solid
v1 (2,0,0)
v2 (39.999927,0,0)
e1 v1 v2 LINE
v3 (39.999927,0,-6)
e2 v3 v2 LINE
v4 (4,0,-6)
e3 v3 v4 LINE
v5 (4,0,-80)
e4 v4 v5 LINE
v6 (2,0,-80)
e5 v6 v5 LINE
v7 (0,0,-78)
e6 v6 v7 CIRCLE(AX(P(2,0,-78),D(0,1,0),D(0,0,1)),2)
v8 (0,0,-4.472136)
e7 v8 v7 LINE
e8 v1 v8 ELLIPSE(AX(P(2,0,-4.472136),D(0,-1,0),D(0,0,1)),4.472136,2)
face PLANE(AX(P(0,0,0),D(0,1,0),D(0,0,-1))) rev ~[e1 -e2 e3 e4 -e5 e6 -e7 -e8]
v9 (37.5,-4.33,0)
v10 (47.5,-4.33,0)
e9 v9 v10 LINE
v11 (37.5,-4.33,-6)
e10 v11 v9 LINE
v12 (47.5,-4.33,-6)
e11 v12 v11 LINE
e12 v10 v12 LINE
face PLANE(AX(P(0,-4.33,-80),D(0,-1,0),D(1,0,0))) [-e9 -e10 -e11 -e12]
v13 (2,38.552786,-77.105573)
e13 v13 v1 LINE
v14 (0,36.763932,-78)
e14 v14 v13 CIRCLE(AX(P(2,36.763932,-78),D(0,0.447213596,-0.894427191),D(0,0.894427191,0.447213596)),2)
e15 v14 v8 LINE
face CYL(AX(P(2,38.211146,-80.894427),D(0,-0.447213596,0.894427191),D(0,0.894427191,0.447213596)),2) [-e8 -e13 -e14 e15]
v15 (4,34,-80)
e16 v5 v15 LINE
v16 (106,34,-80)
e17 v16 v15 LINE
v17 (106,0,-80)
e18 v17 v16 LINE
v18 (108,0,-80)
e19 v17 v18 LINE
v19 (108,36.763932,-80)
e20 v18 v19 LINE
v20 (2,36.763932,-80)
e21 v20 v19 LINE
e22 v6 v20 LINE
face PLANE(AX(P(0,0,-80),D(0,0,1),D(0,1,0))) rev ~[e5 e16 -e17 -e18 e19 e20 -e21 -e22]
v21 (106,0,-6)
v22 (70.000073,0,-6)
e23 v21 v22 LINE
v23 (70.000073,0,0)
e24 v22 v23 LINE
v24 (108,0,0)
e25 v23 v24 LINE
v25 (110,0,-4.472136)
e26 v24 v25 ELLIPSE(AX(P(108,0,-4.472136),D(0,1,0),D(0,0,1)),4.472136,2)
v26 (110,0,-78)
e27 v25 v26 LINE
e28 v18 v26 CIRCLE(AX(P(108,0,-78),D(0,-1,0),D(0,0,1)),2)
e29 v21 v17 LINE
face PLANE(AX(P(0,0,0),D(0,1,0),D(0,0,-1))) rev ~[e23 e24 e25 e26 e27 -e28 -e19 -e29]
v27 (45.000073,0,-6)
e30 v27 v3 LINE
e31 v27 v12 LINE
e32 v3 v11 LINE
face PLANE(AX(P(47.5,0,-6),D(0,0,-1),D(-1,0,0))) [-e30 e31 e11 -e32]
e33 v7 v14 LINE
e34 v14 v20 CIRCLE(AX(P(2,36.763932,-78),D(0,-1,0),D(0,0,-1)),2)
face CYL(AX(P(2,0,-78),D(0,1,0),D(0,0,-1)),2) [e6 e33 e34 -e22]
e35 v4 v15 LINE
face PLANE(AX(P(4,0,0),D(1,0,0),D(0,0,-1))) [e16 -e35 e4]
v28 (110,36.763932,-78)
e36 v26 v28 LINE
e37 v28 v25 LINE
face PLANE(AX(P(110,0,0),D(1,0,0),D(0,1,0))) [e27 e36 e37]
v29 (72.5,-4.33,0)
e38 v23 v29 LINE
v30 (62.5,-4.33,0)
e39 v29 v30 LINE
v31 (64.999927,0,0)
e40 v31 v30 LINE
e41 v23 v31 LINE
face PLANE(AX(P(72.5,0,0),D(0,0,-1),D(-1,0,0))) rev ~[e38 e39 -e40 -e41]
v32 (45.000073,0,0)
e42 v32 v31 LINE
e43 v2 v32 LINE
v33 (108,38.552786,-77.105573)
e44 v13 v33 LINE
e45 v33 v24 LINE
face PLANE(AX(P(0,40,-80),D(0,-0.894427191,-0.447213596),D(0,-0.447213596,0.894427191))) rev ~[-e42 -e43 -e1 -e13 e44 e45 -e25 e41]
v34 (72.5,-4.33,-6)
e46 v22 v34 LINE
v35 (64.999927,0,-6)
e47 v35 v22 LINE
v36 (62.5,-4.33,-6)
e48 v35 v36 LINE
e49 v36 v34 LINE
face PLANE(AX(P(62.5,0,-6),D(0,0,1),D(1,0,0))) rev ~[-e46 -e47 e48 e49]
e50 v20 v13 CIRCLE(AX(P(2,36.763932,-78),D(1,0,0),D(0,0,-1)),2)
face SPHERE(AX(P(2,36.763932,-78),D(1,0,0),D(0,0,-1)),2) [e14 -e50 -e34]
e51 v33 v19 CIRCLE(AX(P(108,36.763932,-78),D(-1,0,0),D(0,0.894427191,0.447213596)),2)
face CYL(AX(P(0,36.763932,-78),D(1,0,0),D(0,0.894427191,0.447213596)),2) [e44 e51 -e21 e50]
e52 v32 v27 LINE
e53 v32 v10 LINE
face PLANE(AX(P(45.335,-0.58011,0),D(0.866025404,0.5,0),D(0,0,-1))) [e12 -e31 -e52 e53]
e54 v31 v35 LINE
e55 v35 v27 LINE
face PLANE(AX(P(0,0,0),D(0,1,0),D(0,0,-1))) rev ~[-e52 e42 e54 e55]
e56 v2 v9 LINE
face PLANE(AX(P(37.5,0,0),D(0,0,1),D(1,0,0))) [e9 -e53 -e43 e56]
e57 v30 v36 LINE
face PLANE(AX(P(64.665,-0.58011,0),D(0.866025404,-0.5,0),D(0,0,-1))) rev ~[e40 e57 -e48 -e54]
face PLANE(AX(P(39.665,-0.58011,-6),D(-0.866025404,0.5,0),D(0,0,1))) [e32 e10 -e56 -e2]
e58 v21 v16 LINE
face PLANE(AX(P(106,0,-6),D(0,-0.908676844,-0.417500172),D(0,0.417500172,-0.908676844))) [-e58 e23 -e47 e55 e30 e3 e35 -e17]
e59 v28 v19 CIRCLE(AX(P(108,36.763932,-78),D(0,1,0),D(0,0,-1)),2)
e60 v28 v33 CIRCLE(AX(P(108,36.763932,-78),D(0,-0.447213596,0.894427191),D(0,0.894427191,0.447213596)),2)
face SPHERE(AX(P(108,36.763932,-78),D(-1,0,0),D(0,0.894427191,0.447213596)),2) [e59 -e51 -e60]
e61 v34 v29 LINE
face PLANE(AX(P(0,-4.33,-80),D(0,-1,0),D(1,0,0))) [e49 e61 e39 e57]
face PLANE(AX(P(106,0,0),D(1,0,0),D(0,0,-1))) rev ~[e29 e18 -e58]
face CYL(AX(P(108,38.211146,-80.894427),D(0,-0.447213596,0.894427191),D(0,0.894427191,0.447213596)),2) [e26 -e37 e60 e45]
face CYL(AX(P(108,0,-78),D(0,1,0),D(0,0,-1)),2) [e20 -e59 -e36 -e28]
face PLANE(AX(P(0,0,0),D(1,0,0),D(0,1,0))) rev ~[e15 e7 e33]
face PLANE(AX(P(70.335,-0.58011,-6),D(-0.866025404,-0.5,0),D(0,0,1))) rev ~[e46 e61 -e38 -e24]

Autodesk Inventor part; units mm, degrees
ref_plane "YZ Plane" through (0, 0, 0) normal (1, 0, 0) x (0, 1, 0)
ref_plane "XY Plane" through (0, 0, 0) normal (0, 0, 1) x (1, 0, 0)
sketch "Sketch1" plane through (0, 0, 0) normal (1, 0, 0) x (0, 1, 0)
  line L0 (0, 0) -> (0, -80)
  line L1 (0, 0) -> (80, 0) construction
  line L2 (0, -80) -> (40, -80)
  line L3 (0, -80) -> (40, -80) construction
  line L4 (40, -80) -> (0, 0)
  dimension "d0" = 80
  dimension "d1" = 90
  dimension "d2" = 40
  dimension "d3" = 0
extrude "Extrusion1" add sketch "Sketch1" along normal blind 110
ref_plane "Work Plane1" through (106, 0, 0) normal (1, 0, 0) x (0, 0, -1)
sketch "Sketch2" plane through (106, 0, 0) normal (1, 0, 0) x (0, 0, -1)
  line L0 (0, 0) -> (80, 0) projected
  line L1 (80, 0) -> (80, 40) projected
  line L2 (80, 40) -> (0, 0) projected
  line L3 (0, 0) -> (80, 0) projected
  line L4 (80, 0) -> (80, 34)
  line L5 (80, 0) -> (80, 40) projected
  line L6 (80, 0) -> (114, 0) construction
  line L7 (80, 0) -> (6, 0)
  line L8 (80, 0) -> (154, 0) construction
  line L9 (6, 0) -> (80, 34)
  dimension "d7" = 34
  dimension "d8" = 90
  dimension "d9" = 74
  dimension "d10" = 180
extrude "Extrusion2" cut sketch "Sketch2" against normal blind 102 contours L9 L1 L0
sketch "Sketch3" plane through (0, 0, -80) normal (0, -1, 0) x (1, 0, 0)
  line L0 (0, 80) -> (0, 0) construction
  line L1 (0, 80) -> (37.5, 80) construction
  line L2 (0, 80) -> (37.5, 80) construction
  line L3 (106, 74) -> (106, 0) construction
  line L4 (106, 0) -> (110, 0) construction
  line L5 (110, 80) -> (110, 0) construction
  line L6 (0, 80) -> (110, 80) construction
  line L7 (0, 80) -> (0, 0) construction
  line L8 (0, 0) -> (4, 0) construction
  line L9 (4, 0) -> (4, 74) construction
  line L10 (4, 74) -> (106, 74) construction
  line L11 (110, 80) -> (110, 0) construction
  line L12 (110, 80) -> (72.5, 80) construction
  line L13 (0, 80) -> (110, 80) construction
  line L14 (110, 80) -> (147.5, 80) construction
  line L15 (37.5, 80) -> (47.5, 80)
  line L16 (47.5, 80) -> (47.5, 74)
  line L17 (47.5, 74) -> (37.5, 74)
  line L18 (37.5, 74) -> (37.5, 80)
  line L19 (72.5, 80) -> (62.5, 80)
  line L20 (62.5, 80) -> (62.5, 74)
  line L21 (62.5, 74) -> (72.5, 74)
  line L22 (72.5, 74) -> (72.5, 80)
  dimension "d13" = 37.5
  dimension "d14" = 0
  dimension "d17" = 37.5
  dimension "d18" = 180
  dimension "d21" = 10
  dimension "d22" = 6
  dimension "d23" = 10
  dimension "d24" = 6
extrude "Extrusion3" add sketch "Sketch3" along normal blind 4.33
draft "FaceDraft1" angle 30 pull direction (0, 1, 0) faces at (47.5, -1.4433, -2) fixed edges at (47.5, -4.33, -3)
draft "FaceDraft2" angle 30 pull direction (0, 1, 0) faces at (37.5, -1.4433, -4) fixed edges at (37.5, -4.33, -3)
draft "FaceDraft4" angle -30 pull direction (0, -1, 0) faces at (72.5, -1.4433, -4) fixed edges at (72.5, -4.33, -3)
fillet "Fillet2" radius 2 5 edges at (110, 20, -40) (110, 20, -80) (55, 40, -80) (0, 20, -80) (0, 20, -40)
draft "FaceDraft5" angle 30 pull direction (0, 1, 0) faces at (62.5, -1.4433, -2) fixed edges at (62.5, -4.33, -3)
properties part number "foot_cover_2_top"
